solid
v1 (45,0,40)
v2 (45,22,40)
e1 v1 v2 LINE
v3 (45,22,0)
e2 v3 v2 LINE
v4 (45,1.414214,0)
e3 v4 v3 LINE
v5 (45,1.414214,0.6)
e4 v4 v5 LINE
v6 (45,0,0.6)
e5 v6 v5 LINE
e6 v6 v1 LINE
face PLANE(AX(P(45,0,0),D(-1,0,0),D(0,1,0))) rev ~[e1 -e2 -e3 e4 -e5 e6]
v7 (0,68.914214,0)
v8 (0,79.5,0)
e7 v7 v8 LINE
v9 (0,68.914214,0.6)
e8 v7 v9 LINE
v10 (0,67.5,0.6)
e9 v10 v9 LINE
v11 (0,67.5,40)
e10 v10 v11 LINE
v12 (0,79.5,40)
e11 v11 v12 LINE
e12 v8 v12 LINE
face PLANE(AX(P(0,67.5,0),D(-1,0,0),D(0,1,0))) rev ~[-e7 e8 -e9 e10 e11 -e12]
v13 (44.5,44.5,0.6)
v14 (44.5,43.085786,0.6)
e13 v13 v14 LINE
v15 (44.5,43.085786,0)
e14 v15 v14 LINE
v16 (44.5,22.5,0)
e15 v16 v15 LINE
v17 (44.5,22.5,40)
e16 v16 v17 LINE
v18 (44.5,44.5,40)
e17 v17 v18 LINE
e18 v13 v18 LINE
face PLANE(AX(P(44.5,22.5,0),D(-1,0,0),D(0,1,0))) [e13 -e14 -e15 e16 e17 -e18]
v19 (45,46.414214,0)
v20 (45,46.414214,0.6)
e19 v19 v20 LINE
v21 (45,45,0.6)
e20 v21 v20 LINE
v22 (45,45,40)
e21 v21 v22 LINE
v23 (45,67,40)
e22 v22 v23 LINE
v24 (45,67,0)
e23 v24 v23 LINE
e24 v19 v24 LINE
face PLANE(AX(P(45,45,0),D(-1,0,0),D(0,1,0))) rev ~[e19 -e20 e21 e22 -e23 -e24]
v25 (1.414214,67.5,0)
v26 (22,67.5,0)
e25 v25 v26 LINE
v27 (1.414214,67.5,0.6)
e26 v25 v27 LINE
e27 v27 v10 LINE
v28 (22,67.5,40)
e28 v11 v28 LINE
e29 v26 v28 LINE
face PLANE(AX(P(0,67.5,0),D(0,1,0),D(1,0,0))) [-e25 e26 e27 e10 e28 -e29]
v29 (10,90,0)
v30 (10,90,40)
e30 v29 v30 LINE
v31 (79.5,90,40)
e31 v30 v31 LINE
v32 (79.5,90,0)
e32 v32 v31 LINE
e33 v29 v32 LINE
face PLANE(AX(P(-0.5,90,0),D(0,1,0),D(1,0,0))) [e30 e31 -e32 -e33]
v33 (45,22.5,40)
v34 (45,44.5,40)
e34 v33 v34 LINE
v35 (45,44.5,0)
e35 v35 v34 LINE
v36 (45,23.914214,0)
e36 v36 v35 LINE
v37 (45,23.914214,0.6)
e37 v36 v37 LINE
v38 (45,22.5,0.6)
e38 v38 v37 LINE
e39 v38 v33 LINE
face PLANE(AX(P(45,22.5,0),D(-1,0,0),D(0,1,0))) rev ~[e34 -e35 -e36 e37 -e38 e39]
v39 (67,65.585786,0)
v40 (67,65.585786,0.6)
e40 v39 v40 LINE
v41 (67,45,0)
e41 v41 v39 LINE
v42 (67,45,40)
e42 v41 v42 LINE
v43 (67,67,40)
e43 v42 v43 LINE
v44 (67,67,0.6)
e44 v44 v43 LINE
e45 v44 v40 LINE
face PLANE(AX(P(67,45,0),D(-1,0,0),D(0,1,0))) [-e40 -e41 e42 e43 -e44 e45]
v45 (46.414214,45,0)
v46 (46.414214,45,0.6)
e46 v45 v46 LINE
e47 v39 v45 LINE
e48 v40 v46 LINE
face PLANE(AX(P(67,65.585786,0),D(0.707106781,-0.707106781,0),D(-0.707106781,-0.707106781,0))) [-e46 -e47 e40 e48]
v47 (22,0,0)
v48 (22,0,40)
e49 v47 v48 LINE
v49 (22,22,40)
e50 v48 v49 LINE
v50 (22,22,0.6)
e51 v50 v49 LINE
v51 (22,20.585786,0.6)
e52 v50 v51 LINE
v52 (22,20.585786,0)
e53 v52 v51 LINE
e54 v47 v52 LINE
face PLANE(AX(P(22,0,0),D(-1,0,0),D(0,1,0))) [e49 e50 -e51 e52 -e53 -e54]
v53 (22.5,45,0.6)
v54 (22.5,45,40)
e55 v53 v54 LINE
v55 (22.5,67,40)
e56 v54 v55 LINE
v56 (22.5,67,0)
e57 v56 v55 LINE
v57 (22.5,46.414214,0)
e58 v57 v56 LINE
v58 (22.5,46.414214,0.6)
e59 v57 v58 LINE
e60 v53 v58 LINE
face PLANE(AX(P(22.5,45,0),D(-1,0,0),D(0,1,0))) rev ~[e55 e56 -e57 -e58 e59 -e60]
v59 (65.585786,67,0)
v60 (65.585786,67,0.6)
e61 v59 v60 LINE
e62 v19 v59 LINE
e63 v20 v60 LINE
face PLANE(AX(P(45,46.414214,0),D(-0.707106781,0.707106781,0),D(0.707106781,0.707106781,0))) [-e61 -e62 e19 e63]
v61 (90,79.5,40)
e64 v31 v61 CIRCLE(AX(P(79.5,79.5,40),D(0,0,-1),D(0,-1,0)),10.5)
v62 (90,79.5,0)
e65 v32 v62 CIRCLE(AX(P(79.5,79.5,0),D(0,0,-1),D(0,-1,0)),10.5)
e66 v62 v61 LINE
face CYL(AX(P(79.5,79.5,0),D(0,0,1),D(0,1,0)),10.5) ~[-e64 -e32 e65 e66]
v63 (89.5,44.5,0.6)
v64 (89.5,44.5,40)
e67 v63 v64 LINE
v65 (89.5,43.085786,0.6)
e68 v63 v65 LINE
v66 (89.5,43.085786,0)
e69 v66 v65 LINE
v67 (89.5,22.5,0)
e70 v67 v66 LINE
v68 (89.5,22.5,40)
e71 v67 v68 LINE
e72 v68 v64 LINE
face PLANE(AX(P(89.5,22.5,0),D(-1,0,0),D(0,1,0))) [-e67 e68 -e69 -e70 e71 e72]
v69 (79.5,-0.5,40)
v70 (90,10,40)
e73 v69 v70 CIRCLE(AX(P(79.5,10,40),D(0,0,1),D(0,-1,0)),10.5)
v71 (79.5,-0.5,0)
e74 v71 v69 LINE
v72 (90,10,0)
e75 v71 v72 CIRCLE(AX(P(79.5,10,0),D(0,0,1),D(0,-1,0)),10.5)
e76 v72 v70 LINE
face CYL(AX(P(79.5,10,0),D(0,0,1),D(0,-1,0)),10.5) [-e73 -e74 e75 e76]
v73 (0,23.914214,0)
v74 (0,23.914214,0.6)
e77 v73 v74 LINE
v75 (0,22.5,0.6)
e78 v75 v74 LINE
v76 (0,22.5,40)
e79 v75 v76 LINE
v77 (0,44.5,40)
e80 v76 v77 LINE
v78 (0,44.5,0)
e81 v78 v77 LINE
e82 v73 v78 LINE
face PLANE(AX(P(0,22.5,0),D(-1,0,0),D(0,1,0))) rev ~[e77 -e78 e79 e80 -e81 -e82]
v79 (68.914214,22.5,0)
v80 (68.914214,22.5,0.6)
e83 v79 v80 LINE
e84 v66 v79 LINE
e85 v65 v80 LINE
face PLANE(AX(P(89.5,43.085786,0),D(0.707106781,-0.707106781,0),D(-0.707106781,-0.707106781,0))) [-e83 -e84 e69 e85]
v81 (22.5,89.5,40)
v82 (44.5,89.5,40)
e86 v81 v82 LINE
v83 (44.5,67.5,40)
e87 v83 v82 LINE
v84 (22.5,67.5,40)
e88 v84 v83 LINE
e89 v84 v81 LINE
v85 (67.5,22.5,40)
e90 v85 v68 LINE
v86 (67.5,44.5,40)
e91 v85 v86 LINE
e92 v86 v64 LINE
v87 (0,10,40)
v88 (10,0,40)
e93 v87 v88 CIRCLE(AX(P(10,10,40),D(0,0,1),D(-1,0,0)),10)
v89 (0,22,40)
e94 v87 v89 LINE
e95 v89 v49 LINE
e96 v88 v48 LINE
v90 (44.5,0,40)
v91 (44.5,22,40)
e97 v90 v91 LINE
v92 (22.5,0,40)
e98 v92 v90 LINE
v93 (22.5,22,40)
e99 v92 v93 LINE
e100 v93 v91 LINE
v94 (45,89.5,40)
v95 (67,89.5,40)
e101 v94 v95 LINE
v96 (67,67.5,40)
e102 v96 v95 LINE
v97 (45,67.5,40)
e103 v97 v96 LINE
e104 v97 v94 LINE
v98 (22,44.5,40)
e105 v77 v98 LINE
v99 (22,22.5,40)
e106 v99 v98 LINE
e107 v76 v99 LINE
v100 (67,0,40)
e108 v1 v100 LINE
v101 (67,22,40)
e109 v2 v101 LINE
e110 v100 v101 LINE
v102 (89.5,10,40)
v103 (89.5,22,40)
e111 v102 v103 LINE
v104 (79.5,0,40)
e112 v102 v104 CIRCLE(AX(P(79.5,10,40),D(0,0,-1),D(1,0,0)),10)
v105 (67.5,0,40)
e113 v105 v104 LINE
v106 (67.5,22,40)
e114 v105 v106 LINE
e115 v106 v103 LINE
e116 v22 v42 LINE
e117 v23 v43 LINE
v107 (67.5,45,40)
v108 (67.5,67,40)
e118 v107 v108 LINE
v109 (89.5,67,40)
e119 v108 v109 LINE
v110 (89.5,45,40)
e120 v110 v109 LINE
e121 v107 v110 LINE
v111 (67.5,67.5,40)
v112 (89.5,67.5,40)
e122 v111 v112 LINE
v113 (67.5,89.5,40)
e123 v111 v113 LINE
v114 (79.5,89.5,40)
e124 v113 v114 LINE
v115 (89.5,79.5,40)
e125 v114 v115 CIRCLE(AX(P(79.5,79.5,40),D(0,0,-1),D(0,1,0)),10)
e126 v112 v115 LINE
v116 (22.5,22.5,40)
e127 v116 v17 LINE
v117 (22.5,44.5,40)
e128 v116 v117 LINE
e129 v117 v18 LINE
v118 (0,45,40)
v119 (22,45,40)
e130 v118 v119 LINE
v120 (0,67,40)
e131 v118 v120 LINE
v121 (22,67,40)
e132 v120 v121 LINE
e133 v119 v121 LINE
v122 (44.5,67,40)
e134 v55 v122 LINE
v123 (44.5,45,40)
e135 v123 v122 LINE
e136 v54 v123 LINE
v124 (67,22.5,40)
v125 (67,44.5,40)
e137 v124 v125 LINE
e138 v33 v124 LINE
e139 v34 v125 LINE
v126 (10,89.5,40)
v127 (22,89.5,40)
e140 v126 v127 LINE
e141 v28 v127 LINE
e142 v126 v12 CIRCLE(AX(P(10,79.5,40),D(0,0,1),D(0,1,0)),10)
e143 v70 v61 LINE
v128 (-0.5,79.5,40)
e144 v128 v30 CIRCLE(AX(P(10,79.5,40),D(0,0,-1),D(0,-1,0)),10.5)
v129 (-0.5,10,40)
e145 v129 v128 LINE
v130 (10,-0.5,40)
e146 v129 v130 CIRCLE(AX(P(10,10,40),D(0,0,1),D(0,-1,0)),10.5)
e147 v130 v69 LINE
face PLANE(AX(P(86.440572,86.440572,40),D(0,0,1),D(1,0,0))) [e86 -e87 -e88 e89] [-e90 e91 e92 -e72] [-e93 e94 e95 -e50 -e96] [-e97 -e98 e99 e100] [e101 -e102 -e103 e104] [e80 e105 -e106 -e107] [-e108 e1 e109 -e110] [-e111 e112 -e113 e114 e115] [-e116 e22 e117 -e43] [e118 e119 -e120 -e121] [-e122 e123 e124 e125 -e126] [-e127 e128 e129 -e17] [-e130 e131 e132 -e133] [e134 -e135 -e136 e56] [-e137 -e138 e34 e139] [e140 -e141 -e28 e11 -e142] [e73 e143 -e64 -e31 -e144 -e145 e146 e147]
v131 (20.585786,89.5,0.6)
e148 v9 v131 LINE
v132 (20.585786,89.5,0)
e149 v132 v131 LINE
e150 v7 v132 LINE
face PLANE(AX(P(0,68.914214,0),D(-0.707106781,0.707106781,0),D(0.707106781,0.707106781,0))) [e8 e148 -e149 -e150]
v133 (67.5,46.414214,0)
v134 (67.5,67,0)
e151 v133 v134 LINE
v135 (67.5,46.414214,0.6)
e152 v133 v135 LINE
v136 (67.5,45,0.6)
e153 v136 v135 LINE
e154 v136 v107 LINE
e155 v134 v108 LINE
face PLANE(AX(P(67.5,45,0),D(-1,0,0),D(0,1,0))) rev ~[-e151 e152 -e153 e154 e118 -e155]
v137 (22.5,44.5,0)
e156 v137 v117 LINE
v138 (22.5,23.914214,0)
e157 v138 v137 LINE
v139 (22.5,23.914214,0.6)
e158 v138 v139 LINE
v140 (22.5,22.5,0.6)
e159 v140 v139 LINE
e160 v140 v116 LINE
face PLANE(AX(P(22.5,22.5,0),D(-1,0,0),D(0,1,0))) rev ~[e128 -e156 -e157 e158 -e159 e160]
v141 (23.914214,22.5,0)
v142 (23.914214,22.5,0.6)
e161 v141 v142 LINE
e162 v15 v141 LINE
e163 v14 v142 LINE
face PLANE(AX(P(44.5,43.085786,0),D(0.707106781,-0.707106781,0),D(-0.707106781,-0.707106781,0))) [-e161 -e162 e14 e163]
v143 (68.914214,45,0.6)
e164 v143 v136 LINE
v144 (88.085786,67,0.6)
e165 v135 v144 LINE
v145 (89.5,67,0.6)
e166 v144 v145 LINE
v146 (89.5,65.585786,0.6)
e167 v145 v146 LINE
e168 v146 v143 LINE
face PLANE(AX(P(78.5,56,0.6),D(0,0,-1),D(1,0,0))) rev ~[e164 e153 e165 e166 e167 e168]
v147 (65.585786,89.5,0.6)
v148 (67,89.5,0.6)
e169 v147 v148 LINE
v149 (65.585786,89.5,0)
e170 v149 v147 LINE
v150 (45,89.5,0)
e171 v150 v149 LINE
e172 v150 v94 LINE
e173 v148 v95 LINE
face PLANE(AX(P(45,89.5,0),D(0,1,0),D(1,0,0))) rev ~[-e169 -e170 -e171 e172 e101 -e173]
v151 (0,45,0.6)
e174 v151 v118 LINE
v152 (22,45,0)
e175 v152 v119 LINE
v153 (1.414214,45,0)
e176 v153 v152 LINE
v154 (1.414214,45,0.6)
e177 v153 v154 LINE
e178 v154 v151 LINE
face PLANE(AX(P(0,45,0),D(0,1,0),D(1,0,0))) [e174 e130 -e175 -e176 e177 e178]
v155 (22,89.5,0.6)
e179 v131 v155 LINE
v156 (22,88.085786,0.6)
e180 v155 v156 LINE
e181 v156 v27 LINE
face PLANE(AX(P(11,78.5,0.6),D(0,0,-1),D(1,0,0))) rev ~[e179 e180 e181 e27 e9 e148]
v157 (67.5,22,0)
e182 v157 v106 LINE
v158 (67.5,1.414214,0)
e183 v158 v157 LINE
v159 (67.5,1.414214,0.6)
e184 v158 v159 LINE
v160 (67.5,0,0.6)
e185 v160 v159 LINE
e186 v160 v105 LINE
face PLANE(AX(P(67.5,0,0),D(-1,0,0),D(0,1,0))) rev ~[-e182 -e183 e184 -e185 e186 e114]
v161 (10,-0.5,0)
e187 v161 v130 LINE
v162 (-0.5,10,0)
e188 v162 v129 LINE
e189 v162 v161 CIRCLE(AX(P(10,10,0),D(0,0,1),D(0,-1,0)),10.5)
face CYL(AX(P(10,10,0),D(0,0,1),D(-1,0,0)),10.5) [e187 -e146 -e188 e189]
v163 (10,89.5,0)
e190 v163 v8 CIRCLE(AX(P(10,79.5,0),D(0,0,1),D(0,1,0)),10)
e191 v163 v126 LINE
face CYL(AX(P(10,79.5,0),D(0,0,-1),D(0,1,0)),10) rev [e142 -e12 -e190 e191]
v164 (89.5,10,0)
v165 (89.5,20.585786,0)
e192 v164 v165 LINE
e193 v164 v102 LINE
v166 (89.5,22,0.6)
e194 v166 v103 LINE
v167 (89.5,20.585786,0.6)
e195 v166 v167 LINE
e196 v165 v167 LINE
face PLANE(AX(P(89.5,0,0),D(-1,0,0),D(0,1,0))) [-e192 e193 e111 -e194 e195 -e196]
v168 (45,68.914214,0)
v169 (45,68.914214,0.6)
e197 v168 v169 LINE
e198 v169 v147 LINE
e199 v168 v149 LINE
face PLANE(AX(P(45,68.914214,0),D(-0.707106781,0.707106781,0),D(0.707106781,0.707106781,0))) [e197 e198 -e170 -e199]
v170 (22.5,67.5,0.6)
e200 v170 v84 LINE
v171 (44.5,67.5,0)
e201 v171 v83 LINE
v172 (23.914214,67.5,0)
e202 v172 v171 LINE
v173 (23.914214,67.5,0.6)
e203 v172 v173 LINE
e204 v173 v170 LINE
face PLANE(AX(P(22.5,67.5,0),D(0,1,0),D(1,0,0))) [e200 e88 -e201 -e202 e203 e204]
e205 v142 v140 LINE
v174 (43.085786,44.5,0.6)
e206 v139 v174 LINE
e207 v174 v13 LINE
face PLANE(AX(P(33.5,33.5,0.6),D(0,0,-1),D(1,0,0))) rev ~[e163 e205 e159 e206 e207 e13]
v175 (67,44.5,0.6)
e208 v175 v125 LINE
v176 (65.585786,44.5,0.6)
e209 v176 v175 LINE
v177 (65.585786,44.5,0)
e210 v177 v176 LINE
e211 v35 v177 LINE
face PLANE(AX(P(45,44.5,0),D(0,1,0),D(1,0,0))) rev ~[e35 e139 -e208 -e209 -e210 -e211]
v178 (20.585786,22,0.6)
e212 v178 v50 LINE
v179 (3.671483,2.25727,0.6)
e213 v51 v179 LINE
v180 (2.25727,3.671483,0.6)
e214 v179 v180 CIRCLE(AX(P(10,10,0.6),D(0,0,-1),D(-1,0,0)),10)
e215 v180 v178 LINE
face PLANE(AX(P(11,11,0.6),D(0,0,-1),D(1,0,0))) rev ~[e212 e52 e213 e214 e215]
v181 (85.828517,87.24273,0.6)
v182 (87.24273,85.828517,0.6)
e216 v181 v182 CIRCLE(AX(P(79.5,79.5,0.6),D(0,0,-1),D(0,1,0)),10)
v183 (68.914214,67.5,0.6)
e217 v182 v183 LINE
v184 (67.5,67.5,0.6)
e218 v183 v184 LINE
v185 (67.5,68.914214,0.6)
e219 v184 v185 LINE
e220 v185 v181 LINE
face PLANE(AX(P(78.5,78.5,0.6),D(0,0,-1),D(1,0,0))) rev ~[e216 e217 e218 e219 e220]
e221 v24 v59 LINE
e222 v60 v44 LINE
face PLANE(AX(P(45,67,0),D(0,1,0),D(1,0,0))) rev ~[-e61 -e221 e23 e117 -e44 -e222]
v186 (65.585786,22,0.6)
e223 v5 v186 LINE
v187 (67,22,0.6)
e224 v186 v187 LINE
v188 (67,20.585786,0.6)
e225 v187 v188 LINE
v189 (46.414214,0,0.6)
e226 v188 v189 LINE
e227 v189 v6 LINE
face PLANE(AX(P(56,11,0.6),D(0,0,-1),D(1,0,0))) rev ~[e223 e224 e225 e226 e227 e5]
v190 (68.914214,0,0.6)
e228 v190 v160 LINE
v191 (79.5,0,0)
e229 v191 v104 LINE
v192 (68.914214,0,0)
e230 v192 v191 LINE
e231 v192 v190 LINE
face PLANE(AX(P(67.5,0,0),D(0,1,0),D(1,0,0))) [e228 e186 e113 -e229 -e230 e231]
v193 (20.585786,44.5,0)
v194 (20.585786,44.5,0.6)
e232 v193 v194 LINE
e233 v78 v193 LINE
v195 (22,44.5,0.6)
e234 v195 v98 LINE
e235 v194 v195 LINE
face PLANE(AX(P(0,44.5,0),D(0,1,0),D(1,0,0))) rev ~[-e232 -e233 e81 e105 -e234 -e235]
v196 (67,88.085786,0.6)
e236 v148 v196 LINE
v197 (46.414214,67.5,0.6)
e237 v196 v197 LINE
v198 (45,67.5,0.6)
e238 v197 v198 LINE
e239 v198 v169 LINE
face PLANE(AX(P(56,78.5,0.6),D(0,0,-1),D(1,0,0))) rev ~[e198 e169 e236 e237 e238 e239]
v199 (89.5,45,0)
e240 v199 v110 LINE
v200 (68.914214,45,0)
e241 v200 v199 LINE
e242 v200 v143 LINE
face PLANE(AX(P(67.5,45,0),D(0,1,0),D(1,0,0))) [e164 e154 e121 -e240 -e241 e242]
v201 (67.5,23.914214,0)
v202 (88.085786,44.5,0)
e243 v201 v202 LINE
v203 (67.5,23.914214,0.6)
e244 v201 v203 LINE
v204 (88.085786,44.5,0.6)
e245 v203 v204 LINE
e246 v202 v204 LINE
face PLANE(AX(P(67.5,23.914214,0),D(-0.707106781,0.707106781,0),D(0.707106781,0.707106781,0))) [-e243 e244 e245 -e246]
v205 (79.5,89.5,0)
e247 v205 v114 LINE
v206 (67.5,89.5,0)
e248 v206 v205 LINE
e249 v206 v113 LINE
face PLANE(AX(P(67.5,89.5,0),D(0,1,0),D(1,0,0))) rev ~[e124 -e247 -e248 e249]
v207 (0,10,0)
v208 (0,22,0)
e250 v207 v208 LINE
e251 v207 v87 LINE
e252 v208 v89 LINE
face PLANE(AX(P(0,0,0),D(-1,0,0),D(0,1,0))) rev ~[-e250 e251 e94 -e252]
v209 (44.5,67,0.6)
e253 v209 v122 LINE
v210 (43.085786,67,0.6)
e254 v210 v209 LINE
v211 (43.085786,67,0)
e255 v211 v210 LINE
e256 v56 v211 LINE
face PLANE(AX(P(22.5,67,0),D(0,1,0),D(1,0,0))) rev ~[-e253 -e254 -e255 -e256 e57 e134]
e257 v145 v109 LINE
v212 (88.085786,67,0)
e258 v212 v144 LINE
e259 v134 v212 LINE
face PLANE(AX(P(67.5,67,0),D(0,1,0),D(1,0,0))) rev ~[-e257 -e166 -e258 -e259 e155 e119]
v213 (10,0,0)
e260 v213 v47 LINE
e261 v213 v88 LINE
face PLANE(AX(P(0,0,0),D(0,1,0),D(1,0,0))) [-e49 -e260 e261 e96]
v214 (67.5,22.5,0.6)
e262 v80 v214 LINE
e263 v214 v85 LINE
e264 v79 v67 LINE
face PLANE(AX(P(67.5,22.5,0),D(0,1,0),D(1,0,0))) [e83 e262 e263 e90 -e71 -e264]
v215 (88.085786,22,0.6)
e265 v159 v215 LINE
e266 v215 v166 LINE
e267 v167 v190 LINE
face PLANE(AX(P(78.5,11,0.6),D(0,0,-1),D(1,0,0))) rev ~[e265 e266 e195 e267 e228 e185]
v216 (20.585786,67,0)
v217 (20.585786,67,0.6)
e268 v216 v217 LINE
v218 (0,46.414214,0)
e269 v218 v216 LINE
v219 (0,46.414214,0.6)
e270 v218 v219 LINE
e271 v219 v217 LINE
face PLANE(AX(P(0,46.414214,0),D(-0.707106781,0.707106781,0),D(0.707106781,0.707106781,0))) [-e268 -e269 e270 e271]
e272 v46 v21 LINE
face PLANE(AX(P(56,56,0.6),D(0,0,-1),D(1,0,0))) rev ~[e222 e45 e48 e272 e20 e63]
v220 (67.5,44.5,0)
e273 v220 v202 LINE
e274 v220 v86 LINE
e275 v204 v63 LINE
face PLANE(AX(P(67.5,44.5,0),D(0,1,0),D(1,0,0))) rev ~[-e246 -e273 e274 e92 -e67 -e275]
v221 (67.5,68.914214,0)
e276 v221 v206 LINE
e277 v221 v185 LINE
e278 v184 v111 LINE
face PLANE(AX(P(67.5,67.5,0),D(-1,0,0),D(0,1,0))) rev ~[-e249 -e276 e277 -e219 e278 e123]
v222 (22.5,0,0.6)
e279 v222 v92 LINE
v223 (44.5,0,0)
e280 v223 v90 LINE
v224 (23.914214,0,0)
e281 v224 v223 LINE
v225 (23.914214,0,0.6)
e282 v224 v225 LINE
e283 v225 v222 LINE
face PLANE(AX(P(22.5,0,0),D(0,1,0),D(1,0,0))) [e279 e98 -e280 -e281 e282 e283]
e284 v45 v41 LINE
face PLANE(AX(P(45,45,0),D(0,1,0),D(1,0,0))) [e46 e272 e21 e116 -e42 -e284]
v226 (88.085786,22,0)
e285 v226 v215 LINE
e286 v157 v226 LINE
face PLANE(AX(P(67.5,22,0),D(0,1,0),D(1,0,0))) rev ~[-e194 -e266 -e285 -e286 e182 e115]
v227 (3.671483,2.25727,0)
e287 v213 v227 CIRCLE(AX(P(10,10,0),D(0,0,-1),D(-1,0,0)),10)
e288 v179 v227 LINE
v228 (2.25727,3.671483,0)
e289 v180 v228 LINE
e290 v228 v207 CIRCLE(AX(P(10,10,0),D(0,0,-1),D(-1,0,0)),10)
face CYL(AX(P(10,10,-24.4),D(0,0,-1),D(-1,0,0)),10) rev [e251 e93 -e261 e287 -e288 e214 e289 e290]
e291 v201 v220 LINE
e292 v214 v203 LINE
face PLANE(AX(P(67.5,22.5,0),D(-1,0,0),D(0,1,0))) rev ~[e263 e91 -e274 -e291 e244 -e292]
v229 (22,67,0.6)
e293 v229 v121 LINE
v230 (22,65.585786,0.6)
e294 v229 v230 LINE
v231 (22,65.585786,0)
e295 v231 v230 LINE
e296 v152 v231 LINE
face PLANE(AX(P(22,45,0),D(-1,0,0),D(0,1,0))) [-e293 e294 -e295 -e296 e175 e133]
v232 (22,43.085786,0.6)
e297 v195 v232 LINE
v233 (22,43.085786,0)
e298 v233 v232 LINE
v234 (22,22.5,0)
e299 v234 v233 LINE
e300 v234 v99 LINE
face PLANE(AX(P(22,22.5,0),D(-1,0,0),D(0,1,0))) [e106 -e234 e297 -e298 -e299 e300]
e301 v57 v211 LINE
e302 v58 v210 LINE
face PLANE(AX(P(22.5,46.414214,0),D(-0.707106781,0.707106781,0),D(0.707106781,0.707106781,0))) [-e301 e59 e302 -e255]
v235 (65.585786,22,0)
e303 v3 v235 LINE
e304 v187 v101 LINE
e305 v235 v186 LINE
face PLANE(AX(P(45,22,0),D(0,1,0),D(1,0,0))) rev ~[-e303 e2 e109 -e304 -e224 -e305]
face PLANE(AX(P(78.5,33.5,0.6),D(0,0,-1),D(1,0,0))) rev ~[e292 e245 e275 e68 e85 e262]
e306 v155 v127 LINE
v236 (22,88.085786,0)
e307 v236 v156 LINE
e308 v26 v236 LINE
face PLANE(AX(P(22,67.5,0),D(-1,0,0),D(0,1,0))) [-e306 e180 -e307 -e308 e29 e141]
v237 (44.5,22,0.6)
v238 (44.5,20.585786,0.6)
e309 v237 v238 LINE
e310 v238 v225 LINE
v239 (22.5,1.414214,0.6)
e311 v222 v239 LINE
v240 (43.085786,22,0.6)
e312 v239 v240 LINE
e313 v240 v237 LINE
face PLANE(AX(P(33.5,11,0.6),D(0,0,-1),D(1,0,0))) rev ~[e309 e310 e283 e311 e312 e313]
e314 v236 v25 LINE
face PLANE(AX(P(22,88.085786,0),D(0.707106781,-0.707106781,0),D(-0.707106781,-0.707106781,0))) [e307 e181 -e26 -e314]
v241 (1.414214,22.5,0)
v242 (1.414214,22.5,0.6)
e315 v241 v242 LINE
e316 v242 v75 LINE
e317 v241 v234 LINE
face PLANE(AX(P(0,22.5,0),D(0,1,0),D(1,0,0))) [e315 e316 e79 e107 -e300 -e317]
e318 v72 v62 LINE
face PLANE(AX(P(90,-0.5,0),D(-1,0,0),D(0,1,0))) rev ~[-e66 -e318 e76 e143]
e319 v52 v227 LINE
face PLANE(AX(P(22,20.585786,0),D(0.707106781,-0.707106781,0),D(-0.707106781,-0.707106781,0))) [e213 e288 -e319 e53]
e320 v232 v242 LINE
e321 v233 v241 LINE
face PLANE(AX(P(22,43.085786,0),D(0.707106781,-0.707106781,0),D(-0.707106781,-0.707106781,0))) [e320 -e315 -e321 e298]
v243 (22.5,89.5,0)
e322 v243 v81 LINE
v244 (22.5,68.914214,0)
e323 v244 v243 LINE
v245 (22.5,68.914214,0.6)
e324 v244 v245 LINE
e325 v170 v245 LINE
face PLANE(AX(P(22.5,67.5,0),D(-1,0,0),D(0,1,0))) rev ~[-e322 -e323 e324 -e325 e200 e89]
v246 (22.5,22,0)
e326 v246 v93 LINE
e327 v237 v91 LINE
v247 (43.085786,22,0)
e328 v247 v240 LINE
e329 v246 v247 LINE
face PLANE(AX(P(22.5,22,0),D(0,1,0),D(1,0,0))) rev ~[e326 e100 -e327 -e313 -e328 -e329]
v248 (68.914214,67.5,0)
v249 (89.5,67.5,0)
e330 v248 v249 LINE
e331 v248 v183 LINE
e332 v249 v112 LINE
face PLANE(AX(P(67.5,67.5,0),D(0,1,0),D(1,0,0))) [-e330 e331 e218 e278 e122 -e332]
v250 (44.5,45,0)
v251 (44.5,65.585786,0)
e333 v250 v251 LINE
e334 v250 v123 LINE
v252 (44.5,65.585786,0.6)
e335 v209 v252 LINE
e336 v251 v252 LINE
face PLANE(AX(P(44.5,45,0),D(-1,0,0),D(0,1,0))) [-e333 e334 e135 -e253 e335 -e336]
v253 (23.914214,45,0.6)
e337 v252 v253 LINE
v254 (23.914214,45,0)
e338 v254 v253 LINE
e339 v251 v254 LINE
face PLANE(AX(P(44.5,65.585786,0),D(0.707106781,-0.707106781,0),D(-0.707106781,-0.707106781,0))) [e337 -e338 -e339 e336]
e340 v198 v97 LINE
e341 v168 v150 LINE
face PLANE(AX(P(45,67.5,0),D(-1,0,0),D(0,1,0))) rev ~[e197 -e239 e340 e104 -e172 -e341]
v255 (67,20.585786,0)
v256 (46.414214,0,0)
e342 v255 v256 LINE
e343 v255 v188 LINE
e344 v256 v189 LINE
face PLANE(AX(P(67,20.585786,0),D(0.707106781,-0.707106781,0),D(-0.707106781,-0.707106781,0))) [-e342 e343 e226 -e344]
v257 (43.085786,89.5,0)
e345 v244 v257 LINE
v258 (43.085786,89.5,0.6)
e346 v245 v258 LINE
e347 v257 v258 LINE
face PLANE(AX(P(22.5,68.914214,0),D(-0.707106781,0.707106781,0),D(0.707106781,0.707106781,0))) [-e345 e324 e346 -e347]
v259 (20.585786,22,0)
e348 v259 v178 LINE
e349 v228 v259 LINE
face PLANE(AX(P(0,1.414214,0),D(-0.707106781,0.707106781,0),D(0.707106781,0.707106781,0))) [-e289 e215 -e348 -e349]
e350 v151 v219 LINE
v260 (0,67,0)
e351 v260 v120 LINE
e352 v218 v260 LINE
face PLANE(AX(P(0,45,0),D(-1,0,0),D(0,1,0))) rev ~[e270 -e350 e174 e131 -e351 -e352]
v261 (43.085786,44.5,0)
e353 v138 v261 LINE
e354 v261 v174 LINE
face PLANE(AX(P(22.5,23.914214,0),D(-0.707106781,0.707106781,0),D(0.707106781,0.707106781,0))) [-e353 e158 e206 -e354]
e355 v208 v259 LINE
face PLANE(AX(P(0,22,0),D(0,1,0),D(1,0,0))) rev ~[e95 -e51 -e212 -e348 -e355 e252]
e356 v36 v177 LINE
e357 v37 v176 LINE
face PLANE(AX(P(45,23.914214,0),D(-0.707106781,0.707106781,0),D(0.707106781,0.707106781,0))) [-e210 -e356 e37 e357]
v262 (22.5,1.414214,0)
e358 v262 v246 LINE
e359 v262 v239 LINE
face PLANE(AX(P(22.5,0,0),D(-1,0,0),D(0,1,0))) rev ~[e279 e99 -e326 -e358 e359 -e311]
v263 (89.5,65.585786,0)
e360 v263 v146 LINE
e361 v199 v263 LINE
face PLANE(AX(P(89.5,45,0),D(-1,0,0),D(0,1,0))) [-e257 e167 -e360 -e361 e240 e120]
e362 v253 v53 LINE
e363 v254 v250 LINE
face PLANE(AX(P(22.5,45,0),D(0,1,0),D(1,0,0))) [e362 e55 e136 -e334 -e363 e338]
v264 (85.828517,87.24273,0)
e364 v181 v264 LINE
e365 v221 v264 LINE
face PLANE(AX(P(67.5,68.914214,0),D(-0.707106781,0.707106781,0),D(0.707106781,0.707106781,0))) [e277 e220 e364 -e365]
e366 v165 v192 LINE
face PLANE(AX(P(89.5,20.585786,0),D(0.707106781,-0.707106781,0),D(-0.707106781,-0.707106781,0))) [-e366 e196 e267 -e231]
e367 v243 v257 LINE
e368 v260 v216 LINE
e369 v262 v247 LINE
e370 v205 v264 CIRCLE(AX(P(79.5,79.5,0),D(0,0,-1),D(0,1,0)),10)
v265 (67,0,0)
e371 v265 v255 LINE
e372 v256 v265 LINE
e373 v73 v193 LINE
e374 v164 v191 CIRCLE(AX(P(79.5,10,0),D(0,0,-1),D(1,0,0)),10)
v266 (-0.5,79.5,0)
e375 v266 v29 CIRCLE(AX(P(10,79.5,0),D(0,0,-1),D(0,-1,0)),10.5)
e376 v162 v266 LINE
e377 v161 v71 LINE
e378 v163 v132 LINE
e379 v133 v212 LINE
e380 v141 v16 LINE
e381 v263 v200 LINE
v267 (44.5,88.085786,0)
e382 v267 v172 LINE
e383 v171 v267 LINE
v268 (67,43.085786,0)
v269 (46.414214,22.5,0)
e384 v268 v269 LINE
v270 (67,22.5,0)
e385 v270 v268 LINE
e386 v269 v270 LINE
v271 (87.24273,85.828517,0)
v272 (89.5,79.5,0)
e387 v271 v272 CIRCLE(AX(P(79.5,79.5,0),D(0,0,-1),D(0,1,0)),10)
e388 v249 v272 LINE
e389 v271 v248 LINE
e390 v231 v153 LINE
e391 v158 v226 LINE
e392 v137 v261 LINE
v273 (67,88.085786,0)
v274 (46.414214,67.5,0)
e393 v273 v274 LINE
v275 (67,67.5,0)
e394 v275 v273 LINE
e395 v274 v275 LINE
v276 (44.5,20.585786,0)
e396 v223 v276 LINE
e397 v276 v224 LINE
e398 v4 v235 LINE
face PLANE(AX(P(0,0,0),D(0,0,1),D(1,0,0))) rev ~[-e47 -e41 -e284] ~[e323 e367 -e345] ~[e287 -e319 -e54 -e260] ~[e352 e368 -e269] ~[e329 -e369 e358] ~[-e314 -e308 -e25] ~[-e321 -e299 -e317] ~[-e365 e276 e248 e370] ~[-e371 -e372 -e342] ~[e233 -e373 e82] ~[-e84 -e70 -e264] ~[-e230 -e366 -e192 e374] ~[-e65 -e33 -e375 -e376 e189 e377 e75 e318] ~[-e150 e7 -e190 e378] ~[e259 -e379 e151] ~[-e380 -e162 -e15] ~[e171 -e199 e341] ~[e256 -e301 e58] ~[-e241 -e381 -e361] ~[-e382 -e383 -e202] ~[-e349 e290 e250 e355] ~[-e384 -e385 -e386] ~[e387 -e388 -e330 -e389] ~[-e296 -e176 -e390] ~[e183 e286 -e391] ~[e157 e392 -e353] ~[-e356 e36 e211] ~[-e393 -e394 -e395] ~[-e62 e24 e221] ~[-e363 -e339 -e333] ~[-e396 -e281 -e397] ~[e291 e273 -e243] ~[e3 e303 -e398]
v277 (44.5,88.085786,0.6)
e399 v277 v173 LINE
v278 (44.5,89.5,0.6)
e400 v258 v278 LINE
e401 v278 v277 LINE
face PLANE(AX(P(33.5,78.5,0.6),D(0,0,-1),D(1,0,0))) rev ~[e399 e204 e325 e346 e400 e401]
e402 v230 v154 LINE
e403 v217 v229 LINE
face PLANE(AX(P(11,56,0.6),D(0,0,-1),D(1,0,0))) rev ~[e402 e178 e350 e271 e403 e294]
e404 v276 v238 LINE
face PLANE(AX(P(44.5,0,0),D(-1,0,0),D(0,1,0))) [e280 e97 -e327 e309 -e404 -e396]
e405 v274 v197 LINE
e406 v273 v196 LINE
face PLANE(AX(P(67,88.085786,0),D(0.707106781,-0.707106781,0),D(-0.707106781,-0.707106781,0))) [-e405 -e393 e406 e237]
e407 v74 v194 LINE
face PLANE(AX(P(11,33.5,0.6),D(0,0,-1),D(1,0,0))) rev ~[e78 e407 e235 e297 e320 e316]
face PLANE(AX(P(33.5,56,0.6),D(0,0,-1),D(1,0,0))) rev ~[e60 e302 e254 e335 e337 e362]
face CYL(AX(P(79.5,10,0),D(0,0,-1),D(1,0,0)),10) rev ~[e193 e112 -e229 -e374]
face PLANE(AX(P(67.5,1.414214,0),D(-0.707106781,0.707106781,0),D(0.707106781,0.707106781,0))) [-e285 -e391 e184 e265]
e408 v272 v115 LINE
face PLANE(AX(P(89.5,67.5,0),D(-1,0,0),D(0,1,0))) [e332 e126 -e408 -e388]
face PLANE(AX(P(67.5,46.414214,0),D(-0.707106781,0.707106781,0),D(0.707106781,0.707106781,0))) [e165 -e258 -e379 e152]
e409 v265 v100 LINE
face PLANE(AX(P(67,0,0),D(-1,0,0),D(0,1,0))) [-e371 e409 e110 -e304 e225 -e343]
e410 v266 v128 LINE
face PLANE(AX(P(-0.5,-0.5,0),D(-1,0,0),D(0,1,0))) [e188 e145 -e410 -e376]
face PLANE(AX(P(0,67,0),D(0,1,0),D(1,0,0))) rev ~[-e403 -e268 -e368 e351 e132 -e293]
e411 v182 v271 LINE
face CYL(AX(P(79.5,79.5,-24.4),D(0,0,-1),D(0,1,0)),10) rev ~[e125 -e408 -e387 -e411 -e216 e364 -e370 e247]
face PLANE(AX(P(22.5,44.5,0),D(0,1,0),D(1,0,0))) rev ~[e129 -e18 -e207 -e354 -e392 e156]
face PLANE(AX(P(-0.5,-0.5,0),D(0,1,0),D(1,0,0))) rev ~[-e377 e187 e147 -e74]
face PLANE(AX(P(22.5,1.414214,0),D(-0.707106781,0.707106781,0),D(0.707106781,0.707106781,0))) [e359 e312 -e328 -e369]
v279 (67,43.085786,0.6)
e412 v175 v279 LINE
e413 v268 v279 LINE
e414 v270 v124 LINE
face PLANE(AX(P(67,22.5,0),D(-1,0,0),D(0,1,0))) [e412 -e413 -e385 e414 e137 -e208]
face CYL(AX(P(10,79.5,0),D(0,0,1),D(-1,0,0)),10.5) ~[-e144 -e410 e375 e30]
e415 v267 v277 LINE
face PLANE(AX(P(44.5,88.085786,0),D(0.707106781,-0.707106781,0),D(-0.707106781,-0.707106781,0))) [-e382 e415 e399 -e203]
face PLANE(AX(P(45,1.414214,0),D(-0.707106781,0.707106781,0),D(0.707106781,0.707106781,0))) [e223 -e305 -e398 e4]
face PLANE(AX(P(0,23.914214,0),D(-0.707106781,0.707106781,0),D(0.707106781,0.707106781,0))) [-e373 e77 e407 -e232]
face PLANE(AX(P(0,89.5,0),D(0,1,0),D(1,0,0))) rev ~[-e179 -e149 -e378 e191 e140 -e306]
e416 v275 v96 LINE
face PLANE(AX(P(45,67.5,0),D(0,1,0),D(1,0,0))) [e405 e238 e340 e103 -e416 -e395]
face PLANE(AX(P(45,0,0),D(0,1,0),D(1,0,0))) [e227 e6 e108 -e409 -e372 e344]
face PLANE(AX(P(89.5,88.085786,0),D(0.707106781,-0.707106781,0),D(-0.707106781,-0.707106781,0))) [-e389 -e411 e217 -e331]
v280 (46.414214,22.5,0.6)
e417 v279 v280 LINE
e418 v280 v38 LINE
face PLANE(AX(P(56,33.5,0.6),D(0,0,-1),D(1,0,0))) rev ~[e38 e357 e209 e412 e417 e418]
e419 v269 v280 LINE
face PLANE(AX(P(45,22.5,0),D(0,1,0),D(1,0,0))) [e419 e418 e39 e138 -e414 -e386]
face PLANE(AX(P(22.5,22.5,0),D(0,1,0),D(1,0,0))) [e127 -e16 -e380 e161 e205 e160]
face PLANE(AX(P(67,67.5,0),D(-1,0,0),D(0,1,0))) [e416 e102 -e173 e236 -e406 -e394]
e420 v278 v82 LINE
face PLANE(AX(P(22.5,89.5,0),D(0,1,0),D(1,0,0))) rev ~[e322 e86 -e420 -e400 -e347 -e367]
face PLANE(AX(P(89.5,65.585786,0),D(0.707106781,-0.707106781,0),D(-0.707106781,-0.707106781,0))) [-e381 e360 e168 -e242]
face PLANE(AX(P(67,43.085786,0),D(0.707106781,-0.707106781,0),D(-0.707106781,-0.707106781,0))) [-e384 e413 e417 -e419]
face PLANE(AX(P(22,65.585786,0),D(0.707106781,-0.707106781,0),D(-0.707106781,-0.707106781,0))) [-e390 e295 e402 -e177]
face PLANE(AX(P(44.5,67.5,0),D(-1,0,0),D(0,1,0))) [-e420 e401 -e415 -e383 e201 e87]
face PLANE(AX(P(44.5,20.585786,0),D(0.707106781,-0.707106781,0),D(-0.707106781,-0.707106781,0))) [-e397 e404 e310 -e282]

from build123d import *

# Parameters (mm, degrees)
F1_W         = 90.5
F1_H         = 90.5
F1_W_2       = 22
F1_H_2       = 22
F2_DEPTH     = 40
F4_DEPTH     = 0.6
F5_T1_DEPTH  = 40
F5_T6_DEPTH  = 64.4
F5_T11_DEPTH = 64.4
F6_R         = 10.5


# Not quite as in the source:
# - a fillet or chamfer that OpenCascade refuses, or shapes differently, is made with other operations: its cross-section is extruded or revolved along the edge and cut away or added


with BuildPart() as f2:
    # F1 (on Top) → F2 (new body)
    with BuildSketch(Plane.XY):
        with Locations((44.75, 44.75)):
            Rectangle(F1_W, F1_H)
        with Locations((11, 11)):
            Rectangle(F1_W_2, F1_H_2, mode=Mode.SUBTRACT)
        with Locations((33.5, 11)):
            Rectangle(F1_W_2, F1_H_2, mode=Mode.SUBTRACT)
        with Locations((11, 33.5)):
            Rectangle(F1_W_2, F1_H_2, mode=Mode.SUBTRACT)
        with Locations((33.5, 33.5)):
            Rectangle(F1_W_2, F1_H_2, mode=Mode.SUBTRACT)
        with Locations((56, 11)):
            Rectangle(F1_W_2, F1_H_2, mode=Mode.SUBTRACT)
        with Locations((78.5, 11)):
            Rectangle(F1_W_2, F1_H_2, mode=Mode.SUBTRACT)
        with Locations((56, 33.5)):
            Rectangle(F1_W_2, F1_H_2, mode=Mode.SUBTRACT)
        with Locations((78.5, 33.5)):
            Rectangle(F1_W_2, F1_H_2, mode=Mode.SUBTRACT)
        with Locations((11, 56)):
            Rectangle(F1_W_2, F1_H_2, mode=Mode.SUBTRACT)
        with Locations((33.5, 56)):
            Rectangle(F1_W_2, F1_H_2, mode=Mode.SUBTRACT)
        with Locations((11, 78.5)):
            Rectangle(F1_W_2, F1_H_2, mode=Mode.SUBTRACT)
        with Locations((33.5, 78.5)):
            Rectangle(F1_W_2, F1_H_2, mode=Mode.SUBTRACT)
        with Locations((56, 56)):
            Rectangle(F1_W_2, F1_H_2, mode=Mode.SUBTRACT)
        with Locations((78.5, 56)):
            Rectangle(F1_W_2, F1_H_2, mode=Mode.SUBTRACT)
        with Locations((56, 78.5)):
            Rectangle(F1_W_2, F1_H_2, mode=Mode.SUBTRACT)
        with Locations((78.5, 78.5)):
            Rectangle(F1_W_2, F1_H_2, mode=Mode.SUBTRACT)
    extrude(amount=F2_DEPTH)

    # F3 (on face) → F4 (join)
    with BuildSketch(Plane(origin=(0, 0, 0), x_dir=(1, 0, 0), z_dir=(0, 0, -1))):
        Polygon((22, -89.5), (22, -88.0857864376), (1.4142135624, -67.5), (0, -67.5), (0, -68.9142135624), (20.5857864376, -89.5), align=None)
        Polygon((22, -67), (22, -65.5857864376), (1.4142135624, -45), (0, -45), (0, -46.4142135624), (20.5857864376, -67), align=None)
        Polygon((44.5, -89.5), (44.5, -88.0857864376), (23.9142135624, -67.5), (22.5, -67.5), (22.5, -68.9142135624), (43.0857864376, -89.5), align=None)
        Polygon((22, -44.5), (22, -43.0857864376), (1.4142135624, -22.5), (0, -22.5), (0, -23.9142135624), (20.5857864376, -44.5), align=None)
        Polygon((44.5, -67), (44.5, -65.5857864376), (23.9142135624, -45), (22.5, -45), (22.5, -46.4142135624), (43.0857864376, -67), align=None)
        Polygon((67, -89.5), (67, -88.0857864376), (46.4142135624, -67.5), (45, -67.5), (45, -68.9142135624), (65.5857864376, -89.5), align=None)
        Polygon((89.5, -89.5), (89.5, -88.0857864376), (68.9142135624, -67.5), (67.5, -67.5), (67.5, -68.9142135624), (88.0857864376, -89.5), align=None)
        Polygon((67, -67), (67, -65.5857864376), (46.4142135624, -45), (45, -45), (45, -46.4142135624), (65.5857864376, -67), align=None)
        Polygon((44.5, -44.5), (44.5, -43.0857864376), (23.9142135624, -22.5), (22.5, -22.5), (22.5, -23.9142135624), (43.0857864376, -44.5), align=None)
        Polygon((22, -22), (22, -20.5857864376), (1.4142135624, 0), (0, 0), (0, -1.4142135624), (20.5857864376, -22), align=None)
        Polygon((22.5, -1.4142135624), (43.0857864376, -22), (44.5, -22), (44.5, -20.5857864376), (23.9142135624, 0), (22.5, 0), align=None)
        Polygon((45, -23.9142135624), (65.5857864376, -44.5), (67, -44.5), (67, -43.0857864376), (46.4142135624, -22.5), (45, -22.5), align=None)
        Polygon((67.5, -46.4142135624), (88.0857864376, -67), (89.5, -67), (89.5, -65.5857864376), (68.9142135624, -45), (67.5, -45), align=None)
        Polygon((67.5, -23.9142135624), (88.0857864376, -44.5), (89.5, -44.5), (89.5, -43.0857864376), (68.9142135624, -22.5), (67.5, -22.5), align=None)
        Polygon((45, -1.4142135624), (65.5857864376, -22), (67, -22), (67, -20.5857864376), (46.4142135624, 0), (45, 0), align=None)
        Polygon((67.5, -1.4142135624), (88.0857864376, -22), (89.5, -22), (89.5, -20.5857864376), (68.9142135624, 0), (67.5, 0), align=None)
    extrude(amount=-F4_DEPTH)

    # F5: fillet of radius 10 on 4 edges, made by hand

    # F5_s2 → F5_t1 (join)
    with BuildSketch(Plane.XY):
        with BuildLine():
            ThreePointArc((89.5, 10), (86.5710678119, 2.9289321881), (79.5, 0))
            Line((79.5, 0), (89.5, 0))
            Line((89.5, 0), (89.5, 10))
        make_face()
        with BuildLine():
            ThreePointArc((10, 89.5), (2.9289321881, 86.5710678119), (0, 79.5))
            Line((0, 79.5), (0, 89.5))
            Line((0, 89.5), (10, 89.5))
        make_face()
    extrude(amount=F5_T1_DEPTH)


with BuildPart() as f5_tool4:
    # F5_s5 → F5_t6 (new body)
    with BuildSketch(Plane.XY.offset(-24.4)):
        with BuildLine():
            ThreePointArc((0, 10), (2.9289321881, 2.9289321881), (10, 0))
            Line((10, 0), (0, 0))
            Line((0, 0), (0, 10))
        make_face()
    extrude(amount=F5_T6_DEPTH)

    split(bisect_by=Plane.XY, keep=Keep.TOP)


with BuildPart() as f2_1:
    add(f2.part)

    # F5_t3: union F5_tool4
    add(f5_tool4.part)


with BuildPart() as f5_tool9:
    # F5_s10 → F5_t11 (new body)
    with BuildSketch(Plane.XY.offset(-24.4)):
        with BuildLine():
            ThreePointArc((79.5, 89.5), (86.5710678119, 86.5710678119), (89.5, 79.5))
            Line((89.5, 79.5), (89.5, 89.5))
            Line((89.5, 89.5), (79.5, 89.5))
        make_face()
    extrude(amount=F5_T11_DEPTH)

    split(bisect_by=Plane.XY, keep=Keep.TOP)


with BuildPart() as f2_2:
    add(f2_1.part)

    # F5_t8: union F5_tool9
    add(f5_tool9.part)

    # F6
    f6_edges = [f2_2.edges().sort_by_distance(p)[0] for p in [
        (90, -0.5, 20),
        (-0.5, -0.5, 20),
        (-0.5, 90, 20),
        (90, 90, 20),
    ]]
    fillet(f6_edges, radius=F6_R)


solid = f2_2.part
